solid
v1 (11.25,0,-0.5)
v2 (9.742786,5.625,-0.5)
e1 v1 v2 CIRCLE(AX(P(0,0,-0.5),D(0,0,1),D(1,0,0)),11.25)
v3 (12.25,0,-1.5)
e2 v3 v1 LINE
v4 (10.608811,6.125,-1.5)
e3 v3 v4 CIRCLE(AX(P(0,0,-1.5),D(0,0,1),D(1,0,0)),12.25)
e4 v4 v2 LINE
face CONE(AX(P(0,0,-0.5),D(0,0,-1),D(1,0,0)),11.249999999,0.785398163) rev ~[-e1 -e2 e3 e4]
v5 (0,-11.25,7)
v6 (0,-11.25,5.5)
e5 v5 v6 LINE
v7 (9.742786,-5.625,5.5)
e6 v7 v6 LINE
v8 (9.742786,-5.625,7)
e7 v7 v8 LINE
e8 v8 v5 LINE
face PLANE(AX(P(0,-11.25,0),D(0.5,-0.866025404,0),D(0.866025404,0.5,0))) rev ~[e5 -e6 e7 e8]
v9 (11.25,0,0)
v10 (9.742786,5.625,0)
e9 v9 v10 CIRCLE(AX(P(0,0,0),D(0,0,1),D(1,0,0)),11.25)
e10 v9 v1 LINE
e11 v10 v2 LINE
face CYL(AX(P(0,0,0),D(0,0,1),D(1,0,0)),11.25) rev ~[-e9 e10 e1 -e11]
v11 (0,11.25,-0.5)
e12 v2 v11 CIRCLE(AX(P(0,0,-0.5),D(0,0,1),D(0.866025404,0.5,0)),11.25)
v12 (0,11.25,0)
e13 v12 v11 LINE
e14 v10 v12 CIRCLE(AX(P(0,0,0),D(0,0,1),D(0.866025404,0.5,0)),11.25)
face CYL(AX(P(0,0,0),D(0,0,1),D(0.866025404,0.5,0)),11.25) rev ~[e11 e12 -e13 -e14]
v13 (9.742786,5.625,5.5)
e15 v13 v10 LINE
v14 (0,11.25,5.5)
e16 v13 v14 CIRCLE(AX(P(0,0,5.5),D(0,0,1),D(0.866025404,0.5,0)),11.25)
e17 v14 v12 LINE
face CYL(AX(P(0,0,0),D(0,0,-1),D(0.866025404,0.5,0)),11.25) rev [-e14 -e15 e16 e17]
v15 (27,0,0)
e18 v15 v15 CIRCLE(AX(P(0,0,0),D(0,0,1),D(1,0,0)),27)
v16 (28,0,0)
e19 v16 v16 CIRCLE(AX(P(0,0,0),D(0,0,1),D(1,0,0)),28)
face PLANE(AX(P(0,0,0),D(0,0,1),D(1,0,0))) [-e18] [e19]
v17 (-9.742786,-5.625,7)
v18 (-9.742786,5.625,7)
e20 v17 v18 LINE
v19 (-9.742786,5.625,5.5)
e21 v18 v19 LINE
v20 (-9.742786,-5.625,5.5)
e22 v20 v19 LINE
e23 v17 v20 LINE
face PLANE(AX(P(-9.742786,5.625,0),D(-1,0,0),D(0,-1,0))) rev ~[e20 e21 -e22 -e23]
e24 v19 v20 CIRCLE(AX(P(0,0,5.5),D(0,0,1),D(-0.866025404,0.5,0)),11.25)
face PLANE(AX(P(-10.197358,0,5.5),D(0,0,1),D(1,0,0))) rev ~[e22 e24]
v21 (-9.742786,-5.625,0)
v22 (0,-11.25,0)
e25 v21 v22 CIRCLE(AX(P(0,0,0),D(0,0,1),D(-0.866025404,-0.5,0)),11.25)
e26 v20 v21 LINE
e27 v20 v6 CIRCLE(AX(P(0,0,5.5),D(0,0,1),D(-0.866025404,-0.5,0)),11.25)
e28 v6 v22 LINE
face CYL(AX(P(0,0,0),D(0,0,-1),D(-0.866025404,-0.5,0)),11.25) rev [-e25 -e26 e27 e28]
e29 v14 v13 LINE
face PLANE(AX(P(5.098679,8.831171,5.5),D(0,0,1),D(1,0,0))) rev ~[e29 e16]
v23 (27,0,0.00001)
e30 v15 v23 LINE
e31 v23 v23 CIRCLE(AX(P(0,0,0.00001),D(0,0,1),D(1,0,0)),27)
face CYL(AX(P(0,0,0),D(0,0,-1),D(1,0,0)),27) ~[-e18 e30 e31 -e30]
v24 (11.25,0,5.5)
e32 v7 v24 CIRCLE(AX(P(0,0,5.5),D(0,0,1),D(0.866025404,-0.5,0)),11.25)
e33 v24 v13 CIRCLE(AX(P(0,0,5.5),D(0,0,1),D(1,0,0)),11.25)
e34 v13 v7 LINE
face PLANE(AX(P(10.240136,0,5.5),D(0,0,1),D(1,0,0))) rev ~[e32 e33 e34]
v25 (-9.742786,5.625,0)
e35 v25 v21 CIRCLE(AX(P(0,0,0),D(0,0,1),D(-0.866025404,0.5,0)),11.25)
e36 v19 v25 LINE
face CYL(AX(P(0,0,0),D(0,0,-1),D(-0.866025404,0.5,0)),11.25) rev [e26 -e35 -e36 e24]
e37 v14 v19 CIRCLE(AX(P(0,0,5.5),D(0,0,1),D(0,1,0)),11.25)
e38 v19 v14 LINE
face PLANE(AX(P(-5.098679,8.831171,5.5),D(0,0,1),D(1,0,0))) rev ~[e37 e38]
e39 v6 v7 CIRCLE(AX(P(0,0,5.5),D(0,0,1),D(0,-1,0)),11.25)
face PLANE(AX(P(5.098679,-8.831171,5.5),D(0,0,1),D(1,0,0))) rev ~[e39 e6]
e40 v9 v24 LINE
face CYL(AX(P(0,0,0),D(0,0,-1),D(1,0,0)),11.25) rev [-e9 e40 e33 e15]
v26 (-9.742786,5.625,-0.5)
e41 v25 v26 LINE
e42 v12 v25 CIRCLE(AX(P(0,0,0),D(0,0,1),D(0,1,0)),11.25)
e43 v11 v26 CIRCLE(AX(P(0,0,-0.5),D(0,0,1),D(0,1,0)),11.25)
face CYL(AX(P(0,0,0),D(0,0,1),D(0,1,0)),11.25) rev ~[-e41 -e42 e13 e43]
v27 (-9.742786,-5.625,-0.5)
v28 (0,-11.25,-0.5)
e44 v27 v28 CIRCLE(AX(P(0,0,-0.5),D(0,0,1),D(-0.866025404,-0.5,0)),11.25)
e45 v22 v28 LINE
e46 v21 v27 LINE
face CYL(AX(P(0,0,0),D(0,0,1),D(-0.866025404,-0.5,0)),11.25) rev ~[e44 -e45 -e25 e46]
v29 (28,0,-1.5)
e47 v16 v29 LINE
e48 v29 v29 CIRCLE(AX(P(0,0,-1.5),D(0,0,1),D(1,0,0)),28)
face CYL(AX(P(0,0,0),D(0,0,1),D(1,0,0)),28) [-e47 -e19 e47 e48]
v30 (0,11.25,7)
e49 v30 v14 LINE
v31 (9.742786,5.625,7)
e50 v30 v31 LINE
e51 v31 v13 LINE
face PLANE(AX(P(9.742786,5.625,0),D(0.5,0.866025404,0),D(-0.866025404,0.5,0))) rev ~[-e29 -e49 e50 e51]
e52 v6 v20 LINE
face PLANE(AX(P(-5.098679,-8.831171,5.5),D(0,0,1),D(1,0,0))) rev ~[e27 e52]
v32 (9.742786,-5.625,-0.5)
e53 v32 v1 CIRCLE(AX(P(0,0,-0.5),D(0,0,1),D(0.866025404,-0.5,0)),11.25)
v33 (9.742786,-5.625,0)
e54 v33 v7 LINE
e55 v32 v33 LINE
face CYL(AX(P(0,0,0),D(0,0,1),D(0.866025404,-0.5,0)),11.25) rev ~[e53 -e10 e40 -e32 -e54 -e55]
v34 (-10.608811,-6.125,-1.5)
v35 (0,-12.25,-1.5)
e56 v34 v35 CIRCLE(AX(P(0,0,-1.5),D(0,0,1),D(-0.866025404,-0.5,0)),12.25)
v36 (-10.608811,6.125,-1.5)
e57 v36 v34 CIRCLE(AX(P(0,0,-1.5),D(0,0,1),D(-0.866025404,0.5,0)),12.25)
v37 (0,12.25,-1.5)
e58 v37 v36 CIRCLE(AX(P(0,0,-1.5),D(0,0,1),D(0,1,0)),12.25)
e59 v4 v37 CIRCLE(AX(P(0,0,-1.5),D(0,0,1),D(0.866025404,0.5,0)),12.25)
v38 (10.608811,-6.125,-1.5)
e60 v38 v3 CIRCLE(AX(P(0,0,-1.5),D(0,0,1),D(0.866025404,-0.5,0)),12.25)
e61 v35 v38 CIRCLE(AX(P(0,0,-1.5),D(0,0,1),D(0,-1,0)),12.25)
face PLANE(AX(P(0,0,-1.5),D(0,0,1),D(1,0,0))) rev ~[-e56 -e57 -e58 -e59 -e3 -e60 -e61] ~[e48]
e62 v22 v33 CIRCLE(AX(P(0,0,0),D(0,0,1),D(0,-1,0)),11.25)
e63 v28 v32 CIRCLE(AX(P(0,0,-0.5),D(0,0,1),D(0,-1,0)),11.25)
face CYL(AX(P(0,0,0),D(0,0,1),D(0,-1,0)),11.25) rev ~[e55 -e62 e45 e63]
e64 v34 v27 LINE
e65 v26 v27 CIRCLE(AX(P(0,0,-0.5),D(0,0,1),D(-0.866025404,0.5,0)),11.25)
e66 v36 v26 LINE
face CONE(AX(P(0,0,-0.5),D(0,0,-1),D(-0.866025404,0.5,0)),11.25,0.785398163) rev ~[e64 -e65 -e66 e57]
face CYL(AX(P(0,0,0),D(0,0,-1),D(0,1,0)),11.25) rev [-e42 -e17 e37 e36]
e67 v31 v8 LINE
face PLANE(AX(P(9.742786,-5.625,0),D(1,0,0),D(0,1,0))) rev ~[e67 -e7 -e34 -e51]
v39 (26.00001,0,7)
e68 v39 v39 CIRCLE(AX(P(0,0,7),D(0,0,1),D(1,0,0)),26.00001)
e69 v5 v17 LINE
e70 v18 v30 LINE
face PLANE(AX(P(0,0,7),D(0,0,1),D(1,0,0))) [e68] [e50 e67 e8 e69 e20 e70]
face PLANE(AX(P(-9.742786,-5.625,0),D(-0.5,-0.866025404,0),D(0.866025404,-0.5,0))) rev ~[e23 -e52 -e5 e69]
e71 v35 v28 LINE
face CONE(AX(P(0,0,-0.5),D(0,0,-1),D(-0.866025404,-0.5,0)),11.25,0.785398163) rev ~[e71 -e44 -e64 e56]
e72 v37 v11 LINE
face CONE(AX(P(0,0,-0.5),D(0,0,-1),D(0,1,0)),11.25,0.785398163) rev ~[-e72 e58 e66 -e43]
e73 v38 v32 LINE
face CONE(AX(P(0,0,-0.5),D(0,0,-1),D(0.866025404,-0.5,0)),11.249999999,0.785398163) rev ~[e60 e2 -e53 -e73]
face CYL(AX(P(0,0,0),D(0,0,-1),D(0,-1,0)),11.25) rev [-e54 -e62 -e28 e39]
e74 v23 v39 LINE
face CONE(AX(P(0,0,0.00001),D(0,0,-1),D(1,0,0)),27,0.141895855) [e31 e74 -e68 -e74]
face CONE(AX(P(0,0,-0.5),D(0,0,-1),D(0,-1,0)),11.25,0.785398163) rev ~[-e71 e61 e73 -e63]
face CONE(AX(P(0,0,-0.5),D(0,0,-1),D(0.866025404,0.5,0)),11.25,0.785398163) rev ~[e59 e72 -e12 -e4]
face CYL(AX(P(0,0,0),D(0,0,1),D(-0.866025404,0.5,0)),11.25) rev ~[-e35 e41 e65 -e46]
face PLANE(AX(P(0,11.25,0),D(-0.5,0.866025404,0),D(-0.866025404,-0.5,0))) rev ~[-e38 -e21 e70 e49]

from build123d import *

# Parameters (mm, degrees)
F5_R          = 27
F6_DEPTH      = 7
F5_R_2        = 28
F7_DEPTH      = 1.5
F8_DEPTH      = 7.001
F8_DEPTH_BACK = 1.501
F9_DEPTH      = 5.5
F9_DEPTH_BACK = 1.501
F10_SIZE2     = 0.99999
F10_SIZE      = 6.99999
F11_SIZE      = 1


# Not quite as in the source:
# - a fillet or chamfer is up to 0.001 mm smaller than in the source, because OpenCascade refuses the exact size


with BuildPart() as f6:
    # F5 (on Top) → F6 (new body)
    with BuildSketch(Plane.XY):
        Circle(F5_R)
        with BuildLine():
            ThreePointArc((9.7427857926, 5.625), (10.8666655458, 2.9117142574), (11.25, 0))
            ThreePointArc((11.25, 0), (10.8666655458, -2.9117142574), (9.7427857926, -5.625))
            ThreePointArc((9.7427857926, -5.625), (5.625, -9.7427857926), (0, -11.25))
            ThreePointArc((0, -11.25), (-5.625, -9.7427857926), (-9.7427857926, -5.625))
            ThreePointArc((-9.7427857926, -5.625), (-11.25, 0), (-9.7427857926, 5.625))
            ThreePointArc((-9.7427857926, 5.625), (-5.625, 9.7427857926), (0, 11.25))
            ThreePointArc((0, 11.25), (5.625, 9.7427857926), (9.7427857926, 5.625))
        make_face(mode=Mode.SUBTRACT)
        with BuildLine():
            Line((-9.7427857926, -5.625), (-9.7427857926, 5.625))
            ThreePointArc((-9.7427857926, 5.625), (-11.25, 0), (-9.7427857926, -5.625))
        make_face()
        with BuildLine():
            Line((0, 11.25), (9.7427857926, 5.625))
            ThreePointArc((9.7427857926, 5.625), (5.625, 9.7427857926), (0, 11.25))
        make_face()
        with BuildLine():
            ThreePointArc((9.7427857926, -5.625), (10.8666655458, -2.9117142574), (11.25, 0))
            ThreePointArc((11.25, 0), (10.8666655458, 2.9117142574), (9.7427857926, 5.625))
            Line((9.7427857926, 5.625), (9.7427857926, -5.625))
        make_face()
        with BuildLine():
            ThreePointArc((0, -11.25), (5.625, -9.7427857926), (9.7427857926, -5.625))
            Line((9.7427857926, -5.625), (0, -11.25))
        make_face()
        with BuildLine():
            ThreePointArc((-9.7427857926, -5.625), (-5.625, -9.7427857926), (0, -11.25))
            Line((0, -11.25), (-9.7427857926, -5.625))
        make_face()
        with BuildLine():
            Line((-9.7427857926, 5.625), (0, 11.25))
            ThreePointArc((0, 11.25), (-5.625, 9.7427857926), (-9.7427857926, 5.625))
        make_face()
        Polygon((9.7427857926, -5.625), (9.7427857926, 5.625), (0, 11.25), (-9.7427857926, 5.625), (-9.7427857926, -5.625), (0, -11.25), align=None)
    extrude(amount=F6_DEPTH)

    # F5 (on Top) → F7 (join)
    with BuildSketch(Plane.XY):
        Circle(F5_R_2)
        Circle(F5_R, mode=Mode.SUBTRACT)
        Circle(F5_R)
        with BuildLine():
            ThreePointArc((9.7427857926, 5.625), (10.8666655458, 2.9117142574), (11.25, 0))
            ThreePointArc((11.25, 0), (10.8666655458, -2.9117142574), (9.7427857926, -5.625))
            ThreePointArc((9.7427857926, -5.625), (5.625, -9.7427857926), (0, -11.25))
            ThreePointArc((0, -11.25), (-5.625, -9.7427857926), (-9.7427857926, -5.625))
            ThreePointArc((-9.7427857926, -5.625), (-11.25, 0), (-9.7427857926, 5.625))
            ThreePointArc((-9.7427857926, 5.625), (-5.625, 9.7427857926), (0, 11.25))
            ThreePointArc((0, 11.25), (5.625, 9.7427857926), (9.7427857926, 5.625))
        make_face(mode=Mode.SUBTRACT)
        Polygon((9.7427857926, -5.625), (9.7427857926, 5.625), (0, 11.25), (-9.7427857926, 5.625), (-9.7427857926, -5.625), (0, -11.25), align=None)
        with BuildLine():
            ThreePointArc((9.7427857926, -5.625), (10.8666655458, -2.9117142574), (11.25, 0))
            ThreePointArc((11.25, 0), (10.8666655458, 2.9117142574), (9.7427857926, 5.625))
            Line((9.7427857926, 5.625), (9.7427857926, -5.625))
        make_face()
        with BuildLine():
            ThreePointArc((0, -11.25), (5.625, -9.7427857926), (9.7427857926, -5.625))
            Line((9.7427857926, -5.625), (0, -11.25))
        make_face()
        with BuildLine():
            ThreePointArc((-9.7427857926, -5.625), (-5.625, -9.7427857926), (0, -11.25))
            Line((0, -11.25), (-9.7427857926, -5.625))
        make_face()
        with BuildLine():
            Line((-9.7427857926, -5.625), (-9.7427857926, 5.625))
            ThreePointArc((-9.7427857926, 5.625), (-11.25, 0), (-9.7427857926, -5.625))
        make_face()
        with BuildLine():
            Line((0, 11.25), (9.7427857926, 5.625))
            ThreePointArc((9.7427857926, 5.625), (5.625, 9.7427857926), (0, 11.25))
        make_face()
        with BuildLine():
            Line((-9.7427857926, 5.625), (0, 11.25))
            ThreePointArc((0, 11.25), (-5.625, 9.7427857926), (-9.7427857926, 5.625))
        make_face()
    extrude(amount=-F7_DEPTH)

    # F5 (on Top) → F8 (cut, two sides)
    with BuildSketch(Plane.XY) as f8_sk:
        Polygon((9.7427857926, -5.625), (9.7427857926, 5.625), (0, 11.25), (-9.7427857926, 5.625), (-9.7427857926, -5.625), (0, -11.25), align=None)
    extrude(amount=F8_DEPTH, mode=Mode.SUBTRACT)
    extrude(f8_sk.sketch, amount=-F8_DEPTH_BACK, mode=Mode.SUBTRACT)

    # F5 (on Top) → F9 (cut, two sides)
    with BuildSketch(Plane.XY) as f9_sk:
        with BuildLine():
            ThreePointArc((-9.7427857926, -5.625), (-5.625, -9.7427857926), (0, -11.25))
            Line((0, -11.25), (-9.7427857926, -5.625))
        make_face()
        with BuildLine():
            ThreePointArc((0, -11.25), (5.625, -9.7427857926), (9.7427857926, -5.625))
            Line((9.7427857926, -5.625), (0, -11.25))
        make_face()
        with BuildLine():
            ThreePointArc((9.7427857926, -5.625), (10.8666655458, -2.9117142574), (11.25, 0))
            ThreePointArc((11.25, 0), (10.8666655458, 2.9117142574), (9.7427857926, 5.625))
            Line((9.7427857926, 5.625), (9.7427857926, -5.625))
        make_face()
        with BuildLine():
            Line((0, 11.25), (9.7427857926, 5.625))
            ThreePointArc((9.7427857926, 5.625), (5.625, 9.7427857926), (0, 11.25))
        make_face()
        with BuildLine():
            Line((-9.7427857926, 5.625), (0, 11.25))
            ThreePointArc((0, 11.25), (-5.625, 9.7427857926), (-9.7427857926, 5.625))
        make_face()
        with BuildLine():
            Line((-9.7427857926, -5.625), (-9.7427857926, 5.625))
            ThreePointArc((-9.7427857926, 5.625), (-11.25, 0), (-9.7427857926, -5.625))
        make_face()
    extrude(amount=F9_DEPTH, mode=Mode.SUBTRACT)
    extrude(f9_sk.sketch, amount=-F9_DEPTH_BACK, mode=Mode.SUBTRACT)

    # F10 (size 7 and 1 in the source; OpenCascade refuses exactly that, so slightly less here)
    f10_edges = [f6.edges().sort_by_distance(p)[0] for p in [
        (-27, 0, 7),
    ]]
    f10_side = f6.faces().sort_by_distance((-27, 0, 3.5))[0]
    chamfer(f10_edges, length=F10_SIZE, length2=F10_SIZE2, reference=f10_side)

    # F11
    f11_edges = [f6.edges().sort_by_distance(p)[0] for p in [
        (0, 11.25, -1.5),
    ]]
    chamfer(f11_edges, length=F11_SIZE)


solid = f6.part
